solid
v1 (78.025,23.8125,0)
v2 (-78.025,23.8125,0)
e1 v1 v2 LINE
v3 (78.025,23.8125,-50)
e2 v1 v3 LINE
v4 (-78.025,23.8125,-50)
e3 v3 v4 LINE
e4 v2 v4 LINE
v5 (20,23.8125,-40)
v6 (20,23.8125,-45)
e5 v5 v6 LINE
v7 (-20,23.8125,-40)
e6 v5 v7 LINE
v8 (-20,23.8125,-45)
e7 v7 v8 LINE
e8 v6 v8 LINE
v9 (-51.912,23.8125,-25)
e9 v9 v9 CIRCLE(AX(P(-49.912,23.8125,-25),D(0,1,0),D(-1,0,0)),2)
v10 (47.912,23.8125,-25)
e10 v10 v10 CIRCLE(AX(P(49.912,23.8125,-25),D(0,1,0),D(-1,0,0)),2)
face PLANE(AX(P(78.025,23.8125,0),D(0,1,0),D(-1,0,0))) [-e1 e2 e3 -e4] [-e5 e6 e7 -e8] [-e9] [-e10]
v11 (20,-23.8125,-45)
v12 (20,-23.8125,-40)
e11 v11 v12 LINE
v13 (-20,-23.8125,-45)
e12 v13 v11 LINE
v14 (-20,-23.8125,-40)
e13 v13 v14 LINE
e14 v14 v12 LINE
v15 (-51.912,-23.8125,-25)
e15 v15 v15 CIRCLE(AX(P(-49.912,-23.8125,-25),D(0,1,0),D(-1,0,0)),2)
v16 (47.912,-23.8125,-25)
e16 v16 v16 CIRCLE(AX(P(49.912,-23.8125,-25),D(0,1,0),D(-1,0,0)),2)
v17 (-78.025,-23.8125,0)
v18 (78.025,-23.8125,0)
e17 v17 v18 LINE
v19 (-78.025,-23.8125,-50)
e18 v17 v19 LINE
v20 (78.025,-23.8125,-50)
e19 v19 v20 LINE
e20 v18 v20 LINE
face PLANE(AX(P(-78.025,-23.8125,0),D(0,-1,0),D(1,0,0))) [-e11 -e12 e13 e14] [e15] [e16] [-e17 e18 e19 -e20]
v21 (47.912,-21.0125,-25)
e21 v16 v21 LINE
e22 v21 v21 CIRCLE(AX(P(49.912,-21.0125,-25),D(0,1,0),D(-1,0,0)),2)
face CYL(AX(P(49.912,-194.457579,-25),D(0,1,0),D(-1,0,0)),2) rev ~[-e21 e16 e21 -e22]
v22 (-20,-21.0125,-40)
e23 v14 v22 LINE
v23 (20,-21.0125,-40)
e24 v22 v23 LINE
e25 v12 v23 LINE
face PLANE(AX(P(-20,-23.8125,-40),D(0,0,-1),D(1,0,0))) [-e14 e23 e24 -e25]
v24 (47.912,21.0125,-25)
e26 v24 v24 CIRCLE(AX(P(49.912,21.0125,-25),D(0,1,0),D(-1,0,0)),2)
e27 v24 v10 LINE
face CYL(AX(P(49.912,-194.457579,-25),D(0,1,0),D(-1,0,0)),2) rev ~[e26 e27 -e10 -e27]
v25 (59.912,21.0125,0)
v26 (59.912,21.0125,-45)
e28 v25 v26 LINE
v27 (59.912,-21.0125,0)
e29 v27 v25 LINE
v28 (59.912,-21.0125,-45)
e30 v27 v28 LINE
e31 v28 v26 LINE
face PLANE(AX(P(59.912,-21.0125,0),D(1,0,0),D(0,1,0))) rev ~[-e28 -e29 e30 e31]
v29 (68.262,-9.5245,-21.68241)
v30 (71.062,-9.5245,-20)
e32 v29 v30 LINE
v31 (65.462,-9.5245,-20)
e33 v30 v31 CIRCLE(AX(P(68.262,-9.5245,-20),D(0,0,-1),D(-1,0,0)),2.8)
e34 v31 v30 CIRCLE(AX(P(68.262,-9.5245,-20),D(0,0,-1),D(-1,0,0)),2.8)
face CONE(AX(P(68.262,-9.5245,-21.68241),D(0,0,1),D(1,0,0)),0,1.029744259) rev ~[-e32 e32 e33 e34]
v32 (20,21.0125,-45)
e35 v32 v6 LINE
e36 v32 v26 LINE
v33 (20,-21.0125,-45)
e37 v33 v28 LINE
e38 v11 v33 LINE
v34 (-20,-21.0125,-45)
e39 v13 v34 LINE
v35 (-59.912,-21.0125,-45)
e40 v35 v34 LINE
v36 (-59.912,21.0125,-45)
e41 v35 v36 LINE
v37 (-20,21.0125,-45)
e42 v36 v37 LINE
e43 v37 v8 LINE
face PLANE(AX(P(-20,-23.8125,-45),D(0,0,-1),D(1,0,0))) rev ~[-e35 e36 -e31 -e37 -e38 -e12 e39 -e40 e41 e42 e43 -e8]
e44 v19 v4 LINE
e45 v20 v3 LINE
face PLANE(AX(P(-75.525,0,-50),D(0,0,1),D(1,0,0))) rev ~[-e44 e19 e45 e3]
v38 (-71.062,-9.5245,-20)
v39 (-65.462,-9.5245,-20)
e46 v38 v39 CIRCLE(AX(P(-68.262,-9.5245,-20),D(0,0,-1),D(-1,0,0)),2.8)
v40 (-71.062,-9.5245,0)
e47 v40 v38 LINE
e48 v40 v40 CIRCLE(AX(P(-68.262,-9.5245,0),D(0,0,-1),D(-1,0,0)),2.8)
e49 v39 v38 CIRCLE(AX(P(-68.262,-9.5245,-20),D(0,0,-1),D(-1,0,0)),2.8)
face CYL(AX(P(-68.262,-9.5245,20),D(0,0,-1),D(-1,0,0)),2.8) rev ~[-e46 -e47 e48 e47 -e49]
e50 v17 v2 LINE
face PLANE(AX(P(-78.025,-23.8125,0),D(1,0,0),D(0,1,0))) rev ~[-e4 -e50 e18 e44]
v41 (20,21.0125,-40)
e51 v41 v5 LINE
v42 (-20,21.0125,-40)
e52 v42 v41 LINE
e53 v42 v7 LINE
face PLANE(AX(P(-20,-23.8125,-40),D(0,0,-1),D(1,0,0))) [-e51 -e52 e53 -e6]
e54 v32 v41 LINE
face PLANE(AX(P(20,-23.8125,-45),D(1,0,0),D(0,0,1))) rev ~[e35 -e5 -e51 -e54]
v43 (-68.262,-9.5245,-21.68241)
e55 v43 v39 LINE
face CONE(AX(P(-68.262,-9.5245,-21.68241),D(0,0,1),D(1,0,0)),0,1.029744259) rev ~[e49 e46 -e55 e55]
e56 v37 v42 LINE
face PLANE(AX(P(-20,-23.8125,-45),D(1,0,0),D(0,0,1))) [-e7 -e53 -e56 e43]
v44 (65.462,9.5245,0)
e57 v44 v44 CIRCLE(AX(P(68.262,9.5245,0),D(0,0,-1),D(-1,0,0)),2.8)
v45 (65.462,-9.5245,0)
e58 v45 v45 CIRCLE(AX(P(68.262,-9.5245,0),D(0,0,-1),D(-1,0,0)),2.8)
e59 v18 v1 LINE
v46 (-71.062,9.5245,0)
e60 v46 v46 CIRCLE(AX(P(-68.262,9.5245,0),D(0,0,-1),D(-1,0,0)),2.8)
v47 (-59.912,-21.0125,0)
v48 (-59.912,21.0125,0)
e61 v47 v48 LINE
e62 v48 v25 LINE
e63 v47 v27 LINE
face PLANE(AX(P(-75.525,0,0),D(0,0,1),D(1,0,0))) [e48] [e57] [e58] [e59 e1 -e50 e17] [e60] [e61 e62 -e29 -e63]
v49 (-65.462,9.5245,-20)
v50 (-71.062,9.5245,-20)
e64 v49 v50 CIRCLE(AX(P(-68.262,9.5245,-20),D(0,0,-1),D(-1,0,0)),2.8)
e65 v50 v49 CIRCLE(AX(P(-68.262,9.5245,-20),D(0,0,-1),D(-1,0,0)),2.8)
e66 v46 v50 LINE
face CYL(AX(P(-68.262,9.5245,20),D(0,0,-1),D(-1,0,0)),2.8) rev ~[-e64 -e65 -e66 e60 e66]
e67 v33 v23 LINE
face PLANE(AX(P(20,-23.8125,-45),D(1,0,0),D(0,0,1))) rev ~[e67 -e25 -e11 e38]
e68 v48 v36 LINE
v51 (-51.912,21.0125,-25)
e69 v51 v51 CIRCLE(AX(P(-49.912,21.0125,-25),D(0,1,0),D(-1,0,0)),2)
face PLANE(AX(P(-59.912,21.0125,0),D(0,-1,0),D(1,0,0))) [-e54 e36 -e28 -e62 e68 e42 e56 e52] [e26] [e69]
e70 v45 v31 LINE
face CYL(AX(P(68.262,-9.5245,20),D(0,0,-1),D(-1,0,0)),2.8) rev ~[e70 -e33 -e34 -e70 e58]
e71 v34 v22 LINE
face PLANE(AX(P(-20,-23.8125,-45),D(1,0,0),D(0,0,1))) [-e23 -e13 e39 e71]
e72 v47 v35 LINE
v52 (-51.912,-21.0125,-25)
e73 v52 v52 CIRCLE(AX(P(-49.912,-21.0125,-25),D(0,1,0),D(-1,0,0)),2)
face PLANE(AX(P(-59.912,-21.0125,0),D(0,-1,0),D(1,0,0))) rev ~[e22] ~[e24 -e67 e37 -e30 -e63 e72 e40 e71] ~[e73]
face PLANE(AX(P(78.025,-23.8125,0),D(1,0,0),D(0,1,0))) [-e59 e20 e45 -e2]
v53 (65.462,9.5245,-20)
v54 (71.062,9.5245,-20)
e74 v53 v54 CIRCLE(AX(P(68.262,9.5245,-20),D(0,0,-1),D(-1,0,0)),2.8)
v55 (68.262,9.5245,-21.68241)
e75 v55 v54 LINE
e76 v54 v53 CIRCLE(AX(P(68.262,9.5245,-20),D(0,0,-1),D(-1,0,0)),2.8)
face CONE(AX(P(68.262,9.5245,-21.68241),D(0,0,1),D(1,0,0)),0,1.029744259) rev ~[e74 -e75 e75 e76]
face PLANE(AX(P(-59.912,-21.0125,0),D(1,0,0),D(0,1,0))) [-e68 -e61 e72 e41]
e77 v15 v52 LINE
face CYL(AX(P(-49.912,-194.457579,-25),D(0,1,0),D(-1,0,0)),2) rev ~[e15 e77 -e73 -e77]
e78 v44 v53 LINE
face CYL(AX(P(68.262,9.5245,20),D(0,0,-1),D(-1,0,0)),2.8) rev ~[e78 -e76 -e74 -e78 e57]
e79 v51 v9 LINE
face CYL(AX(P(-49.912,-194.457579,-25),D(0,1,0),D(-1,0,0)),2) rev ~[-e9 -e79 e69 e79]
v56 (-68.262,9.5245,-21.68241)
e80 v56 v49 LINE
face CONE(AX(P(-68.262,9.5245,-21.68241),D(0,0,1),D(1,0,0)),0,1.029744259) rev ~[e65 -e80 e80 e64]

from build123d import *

# Parameters (mm, degrees)
F0_W     = 5
F0_H     = 47.625
F0_W_2   = 146.05
F0_R     = 3.24
F1_DEPTH = 50
F2_W     = 119.824
F2_H     = 42.025
F3_DEPTH = 45
F4_D     = 5.6
F4_DEPTH = 20
F4_TIP   = 1.6824097333
F5_W     = 40
F5_H     = 5
F6_DEPTH = 47.626
F7_D     = 4


# Not quite as in the source:
# - ends of sketch curves that miss each other by under 0.0002 mm in the source are joined


with BuildPart() as f1:
    # F0 (on Top) → F1 (new body)
    with BuildSketch(Plane.XY):
        with Locations((-75.525, 0)):
            Rectangle(F0_W, F0_H)
        Rectangle(F0_W_2, F0_H)
        with Locations((-68.262, -9.5245)):
            Circle(F0_R, mode=Mode.SUBTRACT)
        with Locations((68.262, -9.5245)):
            Circle(F0_R, mode=Mode.SUBTRACT)
        with Locations((-68.262, 9.5245)):
            Circle(F0_R, mode=Mode.SUBTRACT)
        with BuildLine():
            Line((72.225, -15.859485), (72.225, -23.0125))
            Line((72.225, -23.0125), (-72.225, -23.0125))
            Line((-72.225, -23.0125), (-72.225, -15.874133))
            Line((-72.225, -15.874133), (-68.193705, -15.874133))
            ThreePointArc((-68.193705, -15.874133), (-61.912367271, -9.4562050029), (-68.3302949971, -3.174867271))
            Line((-68.3302949971, -3.174867271), (-72.225, -3.174867))
            Line((-72.225, -3.174867), (-72.225, 3.1745))
            Line((-72.225, 3.1745), (-68.262, 3.1745))
            ThreePointArc((-68.262, 3.1745), (-61.912, 9.5245), (-68.262, 15.8745))
            Line((-68.262, 15.8745), (-72.225, 15.8745))
            Line((-72.225, 15.8745), (-72.225, 23.0125))
            Line((-72.225, 23.0125), (72.225, 23.0125))
            Line((72.225, 23.0125), (72.225, 15.8745))
            Line((72.225, 15.8745), (68.262, 15.8745))
            ThreePointArc((68.262, 15.8745), (61.912, 9.5245), (68.262, 3.1745))
            Line((68.262, 3.1745), (72.225, 3.1745))
            Line((72.225, 3.1745), (72.225, -3.189515))
            Line((72.225, -3.189515), (67.825573, -3.189515))
            ThreePointArc((67.825573, -3.189515), (61.9270152731, -9.9609269812), (68.6984269812, -15.8594847269))
            Line((68.6984269812, -15.8594847269), (72.225, -15.859485))
        make_face(mode=Mode.SUBTRACT)
        with Locations((68.262, 9.5245)):
            Circle(F0_R, mode=Mode.SUBTRACT)
        with Locations((75.525, 0)):
            Rectangle(F0_W, F0_H)
        with Locations((-68.262, 9.5245)):
            Circle(F0_R)
        with Locations((-68.262, -9.5245)):
            Circle(F0_R)
        with BuildLine():
            Line((-72.225, -23.0125), (72.225, -23.0125))
            Line((72.225, -23.0125), (72.225, -15.859485))
            Line((72.225, -15.859485), (68.698427, -15.859485))
            ThreePointArc((68.698427, -15.859485), (61.9270152731, -9.9609269812), (67.8255730188, -3.1895152731))
            Line((67.8255730188, -3.1895152731), (72.225, -3.189515))
            Line((72.225, -3.189515), (72.225, 3.1745))
            Line((72.225, 3.1745), (68.262, 3.1745))
            ThreePointArc((68.262, 3.1745), (61.912, 9.5245), (68.262, 15.8745))
            Line((68.262, 15.8745), (72.225, 15.8745))
            Line((72.225, 15.8745), (72.225, 23.0125))
            Line((72.225, 23.0125), (-72.225, 23.0125))
            Line((-72.225, 23.0125), (-72.225, 15.8745))
            Line((-72.225, 15.8745), (-68.262, 15.8745))
            ThreePointArc((-68.262, 15.8745), (-61.912, 9.5245), (-68.262, 3.1745))
            Line((-68.262, 3.1745), (-72.225, 3.1745))
            Line((-72.225, 3.1745), (-72.225, -3.174867))
            Line((-72.225, -3.174867), (-68.330295, -3.174867))
            ThreePointArc((-68.330295, -3.174867), (-61.912367271, -9.4562050029), (-68.1937050029, -15.874132729))
            Line((-68.1937050029, -15.874132729), (-72.225, -15.874133))
            Line((-72.225, -15.874133), (-72.225, -23.0125))
        make_face()
        with Locations((68.262, 9.5245)):
            Circle(F0_R)
        with Locations((68.262, -9.5245)):
            Circle(F0_R)
    extrude(amount=-F1_DEPTH)

    # F2 (on face) → F3 (cut)
    with BuildSketch(Plane.XY):
        Rectangle(F2_W, F2_H)
    extrude(amount=-F3_DEPTH, mode=Mode.SUBTRACT)

    # F4
    with Locations(Plane.XY):
        with Locations((-68.262, 9.5245), (-68.262, -9.5245), (68.262, 9.5245), (68.262, -9.5245)):
            Hole(F4_D / 2, depth=F4_DEPTH)
            with Locations((0, 0, -(F4_DEPTH + F4_TIP / 2))):  # 118° drill point
                Cone(0, F4_D / 2, F4_TIP, mode=Mode.SUBTRACT)

    # F5 (on face) → F6 (cut, through all)
    with BuildSketch(Plane.XZ.offset(23.8125)):
        with Locations((0, -42.5)):
            Rectangle(F5_W, F5_H)
    extrude(amount=-F6_DEPTH, mode=Mode.SUBTRACT)

    # F7 (through all)
    with Locations(Plane.XZ.offset(23.8125)):
        with Locations((-49.912, -25), (49.912, -25)):
            Hole(F7_D / 2)


solid = f1.part
